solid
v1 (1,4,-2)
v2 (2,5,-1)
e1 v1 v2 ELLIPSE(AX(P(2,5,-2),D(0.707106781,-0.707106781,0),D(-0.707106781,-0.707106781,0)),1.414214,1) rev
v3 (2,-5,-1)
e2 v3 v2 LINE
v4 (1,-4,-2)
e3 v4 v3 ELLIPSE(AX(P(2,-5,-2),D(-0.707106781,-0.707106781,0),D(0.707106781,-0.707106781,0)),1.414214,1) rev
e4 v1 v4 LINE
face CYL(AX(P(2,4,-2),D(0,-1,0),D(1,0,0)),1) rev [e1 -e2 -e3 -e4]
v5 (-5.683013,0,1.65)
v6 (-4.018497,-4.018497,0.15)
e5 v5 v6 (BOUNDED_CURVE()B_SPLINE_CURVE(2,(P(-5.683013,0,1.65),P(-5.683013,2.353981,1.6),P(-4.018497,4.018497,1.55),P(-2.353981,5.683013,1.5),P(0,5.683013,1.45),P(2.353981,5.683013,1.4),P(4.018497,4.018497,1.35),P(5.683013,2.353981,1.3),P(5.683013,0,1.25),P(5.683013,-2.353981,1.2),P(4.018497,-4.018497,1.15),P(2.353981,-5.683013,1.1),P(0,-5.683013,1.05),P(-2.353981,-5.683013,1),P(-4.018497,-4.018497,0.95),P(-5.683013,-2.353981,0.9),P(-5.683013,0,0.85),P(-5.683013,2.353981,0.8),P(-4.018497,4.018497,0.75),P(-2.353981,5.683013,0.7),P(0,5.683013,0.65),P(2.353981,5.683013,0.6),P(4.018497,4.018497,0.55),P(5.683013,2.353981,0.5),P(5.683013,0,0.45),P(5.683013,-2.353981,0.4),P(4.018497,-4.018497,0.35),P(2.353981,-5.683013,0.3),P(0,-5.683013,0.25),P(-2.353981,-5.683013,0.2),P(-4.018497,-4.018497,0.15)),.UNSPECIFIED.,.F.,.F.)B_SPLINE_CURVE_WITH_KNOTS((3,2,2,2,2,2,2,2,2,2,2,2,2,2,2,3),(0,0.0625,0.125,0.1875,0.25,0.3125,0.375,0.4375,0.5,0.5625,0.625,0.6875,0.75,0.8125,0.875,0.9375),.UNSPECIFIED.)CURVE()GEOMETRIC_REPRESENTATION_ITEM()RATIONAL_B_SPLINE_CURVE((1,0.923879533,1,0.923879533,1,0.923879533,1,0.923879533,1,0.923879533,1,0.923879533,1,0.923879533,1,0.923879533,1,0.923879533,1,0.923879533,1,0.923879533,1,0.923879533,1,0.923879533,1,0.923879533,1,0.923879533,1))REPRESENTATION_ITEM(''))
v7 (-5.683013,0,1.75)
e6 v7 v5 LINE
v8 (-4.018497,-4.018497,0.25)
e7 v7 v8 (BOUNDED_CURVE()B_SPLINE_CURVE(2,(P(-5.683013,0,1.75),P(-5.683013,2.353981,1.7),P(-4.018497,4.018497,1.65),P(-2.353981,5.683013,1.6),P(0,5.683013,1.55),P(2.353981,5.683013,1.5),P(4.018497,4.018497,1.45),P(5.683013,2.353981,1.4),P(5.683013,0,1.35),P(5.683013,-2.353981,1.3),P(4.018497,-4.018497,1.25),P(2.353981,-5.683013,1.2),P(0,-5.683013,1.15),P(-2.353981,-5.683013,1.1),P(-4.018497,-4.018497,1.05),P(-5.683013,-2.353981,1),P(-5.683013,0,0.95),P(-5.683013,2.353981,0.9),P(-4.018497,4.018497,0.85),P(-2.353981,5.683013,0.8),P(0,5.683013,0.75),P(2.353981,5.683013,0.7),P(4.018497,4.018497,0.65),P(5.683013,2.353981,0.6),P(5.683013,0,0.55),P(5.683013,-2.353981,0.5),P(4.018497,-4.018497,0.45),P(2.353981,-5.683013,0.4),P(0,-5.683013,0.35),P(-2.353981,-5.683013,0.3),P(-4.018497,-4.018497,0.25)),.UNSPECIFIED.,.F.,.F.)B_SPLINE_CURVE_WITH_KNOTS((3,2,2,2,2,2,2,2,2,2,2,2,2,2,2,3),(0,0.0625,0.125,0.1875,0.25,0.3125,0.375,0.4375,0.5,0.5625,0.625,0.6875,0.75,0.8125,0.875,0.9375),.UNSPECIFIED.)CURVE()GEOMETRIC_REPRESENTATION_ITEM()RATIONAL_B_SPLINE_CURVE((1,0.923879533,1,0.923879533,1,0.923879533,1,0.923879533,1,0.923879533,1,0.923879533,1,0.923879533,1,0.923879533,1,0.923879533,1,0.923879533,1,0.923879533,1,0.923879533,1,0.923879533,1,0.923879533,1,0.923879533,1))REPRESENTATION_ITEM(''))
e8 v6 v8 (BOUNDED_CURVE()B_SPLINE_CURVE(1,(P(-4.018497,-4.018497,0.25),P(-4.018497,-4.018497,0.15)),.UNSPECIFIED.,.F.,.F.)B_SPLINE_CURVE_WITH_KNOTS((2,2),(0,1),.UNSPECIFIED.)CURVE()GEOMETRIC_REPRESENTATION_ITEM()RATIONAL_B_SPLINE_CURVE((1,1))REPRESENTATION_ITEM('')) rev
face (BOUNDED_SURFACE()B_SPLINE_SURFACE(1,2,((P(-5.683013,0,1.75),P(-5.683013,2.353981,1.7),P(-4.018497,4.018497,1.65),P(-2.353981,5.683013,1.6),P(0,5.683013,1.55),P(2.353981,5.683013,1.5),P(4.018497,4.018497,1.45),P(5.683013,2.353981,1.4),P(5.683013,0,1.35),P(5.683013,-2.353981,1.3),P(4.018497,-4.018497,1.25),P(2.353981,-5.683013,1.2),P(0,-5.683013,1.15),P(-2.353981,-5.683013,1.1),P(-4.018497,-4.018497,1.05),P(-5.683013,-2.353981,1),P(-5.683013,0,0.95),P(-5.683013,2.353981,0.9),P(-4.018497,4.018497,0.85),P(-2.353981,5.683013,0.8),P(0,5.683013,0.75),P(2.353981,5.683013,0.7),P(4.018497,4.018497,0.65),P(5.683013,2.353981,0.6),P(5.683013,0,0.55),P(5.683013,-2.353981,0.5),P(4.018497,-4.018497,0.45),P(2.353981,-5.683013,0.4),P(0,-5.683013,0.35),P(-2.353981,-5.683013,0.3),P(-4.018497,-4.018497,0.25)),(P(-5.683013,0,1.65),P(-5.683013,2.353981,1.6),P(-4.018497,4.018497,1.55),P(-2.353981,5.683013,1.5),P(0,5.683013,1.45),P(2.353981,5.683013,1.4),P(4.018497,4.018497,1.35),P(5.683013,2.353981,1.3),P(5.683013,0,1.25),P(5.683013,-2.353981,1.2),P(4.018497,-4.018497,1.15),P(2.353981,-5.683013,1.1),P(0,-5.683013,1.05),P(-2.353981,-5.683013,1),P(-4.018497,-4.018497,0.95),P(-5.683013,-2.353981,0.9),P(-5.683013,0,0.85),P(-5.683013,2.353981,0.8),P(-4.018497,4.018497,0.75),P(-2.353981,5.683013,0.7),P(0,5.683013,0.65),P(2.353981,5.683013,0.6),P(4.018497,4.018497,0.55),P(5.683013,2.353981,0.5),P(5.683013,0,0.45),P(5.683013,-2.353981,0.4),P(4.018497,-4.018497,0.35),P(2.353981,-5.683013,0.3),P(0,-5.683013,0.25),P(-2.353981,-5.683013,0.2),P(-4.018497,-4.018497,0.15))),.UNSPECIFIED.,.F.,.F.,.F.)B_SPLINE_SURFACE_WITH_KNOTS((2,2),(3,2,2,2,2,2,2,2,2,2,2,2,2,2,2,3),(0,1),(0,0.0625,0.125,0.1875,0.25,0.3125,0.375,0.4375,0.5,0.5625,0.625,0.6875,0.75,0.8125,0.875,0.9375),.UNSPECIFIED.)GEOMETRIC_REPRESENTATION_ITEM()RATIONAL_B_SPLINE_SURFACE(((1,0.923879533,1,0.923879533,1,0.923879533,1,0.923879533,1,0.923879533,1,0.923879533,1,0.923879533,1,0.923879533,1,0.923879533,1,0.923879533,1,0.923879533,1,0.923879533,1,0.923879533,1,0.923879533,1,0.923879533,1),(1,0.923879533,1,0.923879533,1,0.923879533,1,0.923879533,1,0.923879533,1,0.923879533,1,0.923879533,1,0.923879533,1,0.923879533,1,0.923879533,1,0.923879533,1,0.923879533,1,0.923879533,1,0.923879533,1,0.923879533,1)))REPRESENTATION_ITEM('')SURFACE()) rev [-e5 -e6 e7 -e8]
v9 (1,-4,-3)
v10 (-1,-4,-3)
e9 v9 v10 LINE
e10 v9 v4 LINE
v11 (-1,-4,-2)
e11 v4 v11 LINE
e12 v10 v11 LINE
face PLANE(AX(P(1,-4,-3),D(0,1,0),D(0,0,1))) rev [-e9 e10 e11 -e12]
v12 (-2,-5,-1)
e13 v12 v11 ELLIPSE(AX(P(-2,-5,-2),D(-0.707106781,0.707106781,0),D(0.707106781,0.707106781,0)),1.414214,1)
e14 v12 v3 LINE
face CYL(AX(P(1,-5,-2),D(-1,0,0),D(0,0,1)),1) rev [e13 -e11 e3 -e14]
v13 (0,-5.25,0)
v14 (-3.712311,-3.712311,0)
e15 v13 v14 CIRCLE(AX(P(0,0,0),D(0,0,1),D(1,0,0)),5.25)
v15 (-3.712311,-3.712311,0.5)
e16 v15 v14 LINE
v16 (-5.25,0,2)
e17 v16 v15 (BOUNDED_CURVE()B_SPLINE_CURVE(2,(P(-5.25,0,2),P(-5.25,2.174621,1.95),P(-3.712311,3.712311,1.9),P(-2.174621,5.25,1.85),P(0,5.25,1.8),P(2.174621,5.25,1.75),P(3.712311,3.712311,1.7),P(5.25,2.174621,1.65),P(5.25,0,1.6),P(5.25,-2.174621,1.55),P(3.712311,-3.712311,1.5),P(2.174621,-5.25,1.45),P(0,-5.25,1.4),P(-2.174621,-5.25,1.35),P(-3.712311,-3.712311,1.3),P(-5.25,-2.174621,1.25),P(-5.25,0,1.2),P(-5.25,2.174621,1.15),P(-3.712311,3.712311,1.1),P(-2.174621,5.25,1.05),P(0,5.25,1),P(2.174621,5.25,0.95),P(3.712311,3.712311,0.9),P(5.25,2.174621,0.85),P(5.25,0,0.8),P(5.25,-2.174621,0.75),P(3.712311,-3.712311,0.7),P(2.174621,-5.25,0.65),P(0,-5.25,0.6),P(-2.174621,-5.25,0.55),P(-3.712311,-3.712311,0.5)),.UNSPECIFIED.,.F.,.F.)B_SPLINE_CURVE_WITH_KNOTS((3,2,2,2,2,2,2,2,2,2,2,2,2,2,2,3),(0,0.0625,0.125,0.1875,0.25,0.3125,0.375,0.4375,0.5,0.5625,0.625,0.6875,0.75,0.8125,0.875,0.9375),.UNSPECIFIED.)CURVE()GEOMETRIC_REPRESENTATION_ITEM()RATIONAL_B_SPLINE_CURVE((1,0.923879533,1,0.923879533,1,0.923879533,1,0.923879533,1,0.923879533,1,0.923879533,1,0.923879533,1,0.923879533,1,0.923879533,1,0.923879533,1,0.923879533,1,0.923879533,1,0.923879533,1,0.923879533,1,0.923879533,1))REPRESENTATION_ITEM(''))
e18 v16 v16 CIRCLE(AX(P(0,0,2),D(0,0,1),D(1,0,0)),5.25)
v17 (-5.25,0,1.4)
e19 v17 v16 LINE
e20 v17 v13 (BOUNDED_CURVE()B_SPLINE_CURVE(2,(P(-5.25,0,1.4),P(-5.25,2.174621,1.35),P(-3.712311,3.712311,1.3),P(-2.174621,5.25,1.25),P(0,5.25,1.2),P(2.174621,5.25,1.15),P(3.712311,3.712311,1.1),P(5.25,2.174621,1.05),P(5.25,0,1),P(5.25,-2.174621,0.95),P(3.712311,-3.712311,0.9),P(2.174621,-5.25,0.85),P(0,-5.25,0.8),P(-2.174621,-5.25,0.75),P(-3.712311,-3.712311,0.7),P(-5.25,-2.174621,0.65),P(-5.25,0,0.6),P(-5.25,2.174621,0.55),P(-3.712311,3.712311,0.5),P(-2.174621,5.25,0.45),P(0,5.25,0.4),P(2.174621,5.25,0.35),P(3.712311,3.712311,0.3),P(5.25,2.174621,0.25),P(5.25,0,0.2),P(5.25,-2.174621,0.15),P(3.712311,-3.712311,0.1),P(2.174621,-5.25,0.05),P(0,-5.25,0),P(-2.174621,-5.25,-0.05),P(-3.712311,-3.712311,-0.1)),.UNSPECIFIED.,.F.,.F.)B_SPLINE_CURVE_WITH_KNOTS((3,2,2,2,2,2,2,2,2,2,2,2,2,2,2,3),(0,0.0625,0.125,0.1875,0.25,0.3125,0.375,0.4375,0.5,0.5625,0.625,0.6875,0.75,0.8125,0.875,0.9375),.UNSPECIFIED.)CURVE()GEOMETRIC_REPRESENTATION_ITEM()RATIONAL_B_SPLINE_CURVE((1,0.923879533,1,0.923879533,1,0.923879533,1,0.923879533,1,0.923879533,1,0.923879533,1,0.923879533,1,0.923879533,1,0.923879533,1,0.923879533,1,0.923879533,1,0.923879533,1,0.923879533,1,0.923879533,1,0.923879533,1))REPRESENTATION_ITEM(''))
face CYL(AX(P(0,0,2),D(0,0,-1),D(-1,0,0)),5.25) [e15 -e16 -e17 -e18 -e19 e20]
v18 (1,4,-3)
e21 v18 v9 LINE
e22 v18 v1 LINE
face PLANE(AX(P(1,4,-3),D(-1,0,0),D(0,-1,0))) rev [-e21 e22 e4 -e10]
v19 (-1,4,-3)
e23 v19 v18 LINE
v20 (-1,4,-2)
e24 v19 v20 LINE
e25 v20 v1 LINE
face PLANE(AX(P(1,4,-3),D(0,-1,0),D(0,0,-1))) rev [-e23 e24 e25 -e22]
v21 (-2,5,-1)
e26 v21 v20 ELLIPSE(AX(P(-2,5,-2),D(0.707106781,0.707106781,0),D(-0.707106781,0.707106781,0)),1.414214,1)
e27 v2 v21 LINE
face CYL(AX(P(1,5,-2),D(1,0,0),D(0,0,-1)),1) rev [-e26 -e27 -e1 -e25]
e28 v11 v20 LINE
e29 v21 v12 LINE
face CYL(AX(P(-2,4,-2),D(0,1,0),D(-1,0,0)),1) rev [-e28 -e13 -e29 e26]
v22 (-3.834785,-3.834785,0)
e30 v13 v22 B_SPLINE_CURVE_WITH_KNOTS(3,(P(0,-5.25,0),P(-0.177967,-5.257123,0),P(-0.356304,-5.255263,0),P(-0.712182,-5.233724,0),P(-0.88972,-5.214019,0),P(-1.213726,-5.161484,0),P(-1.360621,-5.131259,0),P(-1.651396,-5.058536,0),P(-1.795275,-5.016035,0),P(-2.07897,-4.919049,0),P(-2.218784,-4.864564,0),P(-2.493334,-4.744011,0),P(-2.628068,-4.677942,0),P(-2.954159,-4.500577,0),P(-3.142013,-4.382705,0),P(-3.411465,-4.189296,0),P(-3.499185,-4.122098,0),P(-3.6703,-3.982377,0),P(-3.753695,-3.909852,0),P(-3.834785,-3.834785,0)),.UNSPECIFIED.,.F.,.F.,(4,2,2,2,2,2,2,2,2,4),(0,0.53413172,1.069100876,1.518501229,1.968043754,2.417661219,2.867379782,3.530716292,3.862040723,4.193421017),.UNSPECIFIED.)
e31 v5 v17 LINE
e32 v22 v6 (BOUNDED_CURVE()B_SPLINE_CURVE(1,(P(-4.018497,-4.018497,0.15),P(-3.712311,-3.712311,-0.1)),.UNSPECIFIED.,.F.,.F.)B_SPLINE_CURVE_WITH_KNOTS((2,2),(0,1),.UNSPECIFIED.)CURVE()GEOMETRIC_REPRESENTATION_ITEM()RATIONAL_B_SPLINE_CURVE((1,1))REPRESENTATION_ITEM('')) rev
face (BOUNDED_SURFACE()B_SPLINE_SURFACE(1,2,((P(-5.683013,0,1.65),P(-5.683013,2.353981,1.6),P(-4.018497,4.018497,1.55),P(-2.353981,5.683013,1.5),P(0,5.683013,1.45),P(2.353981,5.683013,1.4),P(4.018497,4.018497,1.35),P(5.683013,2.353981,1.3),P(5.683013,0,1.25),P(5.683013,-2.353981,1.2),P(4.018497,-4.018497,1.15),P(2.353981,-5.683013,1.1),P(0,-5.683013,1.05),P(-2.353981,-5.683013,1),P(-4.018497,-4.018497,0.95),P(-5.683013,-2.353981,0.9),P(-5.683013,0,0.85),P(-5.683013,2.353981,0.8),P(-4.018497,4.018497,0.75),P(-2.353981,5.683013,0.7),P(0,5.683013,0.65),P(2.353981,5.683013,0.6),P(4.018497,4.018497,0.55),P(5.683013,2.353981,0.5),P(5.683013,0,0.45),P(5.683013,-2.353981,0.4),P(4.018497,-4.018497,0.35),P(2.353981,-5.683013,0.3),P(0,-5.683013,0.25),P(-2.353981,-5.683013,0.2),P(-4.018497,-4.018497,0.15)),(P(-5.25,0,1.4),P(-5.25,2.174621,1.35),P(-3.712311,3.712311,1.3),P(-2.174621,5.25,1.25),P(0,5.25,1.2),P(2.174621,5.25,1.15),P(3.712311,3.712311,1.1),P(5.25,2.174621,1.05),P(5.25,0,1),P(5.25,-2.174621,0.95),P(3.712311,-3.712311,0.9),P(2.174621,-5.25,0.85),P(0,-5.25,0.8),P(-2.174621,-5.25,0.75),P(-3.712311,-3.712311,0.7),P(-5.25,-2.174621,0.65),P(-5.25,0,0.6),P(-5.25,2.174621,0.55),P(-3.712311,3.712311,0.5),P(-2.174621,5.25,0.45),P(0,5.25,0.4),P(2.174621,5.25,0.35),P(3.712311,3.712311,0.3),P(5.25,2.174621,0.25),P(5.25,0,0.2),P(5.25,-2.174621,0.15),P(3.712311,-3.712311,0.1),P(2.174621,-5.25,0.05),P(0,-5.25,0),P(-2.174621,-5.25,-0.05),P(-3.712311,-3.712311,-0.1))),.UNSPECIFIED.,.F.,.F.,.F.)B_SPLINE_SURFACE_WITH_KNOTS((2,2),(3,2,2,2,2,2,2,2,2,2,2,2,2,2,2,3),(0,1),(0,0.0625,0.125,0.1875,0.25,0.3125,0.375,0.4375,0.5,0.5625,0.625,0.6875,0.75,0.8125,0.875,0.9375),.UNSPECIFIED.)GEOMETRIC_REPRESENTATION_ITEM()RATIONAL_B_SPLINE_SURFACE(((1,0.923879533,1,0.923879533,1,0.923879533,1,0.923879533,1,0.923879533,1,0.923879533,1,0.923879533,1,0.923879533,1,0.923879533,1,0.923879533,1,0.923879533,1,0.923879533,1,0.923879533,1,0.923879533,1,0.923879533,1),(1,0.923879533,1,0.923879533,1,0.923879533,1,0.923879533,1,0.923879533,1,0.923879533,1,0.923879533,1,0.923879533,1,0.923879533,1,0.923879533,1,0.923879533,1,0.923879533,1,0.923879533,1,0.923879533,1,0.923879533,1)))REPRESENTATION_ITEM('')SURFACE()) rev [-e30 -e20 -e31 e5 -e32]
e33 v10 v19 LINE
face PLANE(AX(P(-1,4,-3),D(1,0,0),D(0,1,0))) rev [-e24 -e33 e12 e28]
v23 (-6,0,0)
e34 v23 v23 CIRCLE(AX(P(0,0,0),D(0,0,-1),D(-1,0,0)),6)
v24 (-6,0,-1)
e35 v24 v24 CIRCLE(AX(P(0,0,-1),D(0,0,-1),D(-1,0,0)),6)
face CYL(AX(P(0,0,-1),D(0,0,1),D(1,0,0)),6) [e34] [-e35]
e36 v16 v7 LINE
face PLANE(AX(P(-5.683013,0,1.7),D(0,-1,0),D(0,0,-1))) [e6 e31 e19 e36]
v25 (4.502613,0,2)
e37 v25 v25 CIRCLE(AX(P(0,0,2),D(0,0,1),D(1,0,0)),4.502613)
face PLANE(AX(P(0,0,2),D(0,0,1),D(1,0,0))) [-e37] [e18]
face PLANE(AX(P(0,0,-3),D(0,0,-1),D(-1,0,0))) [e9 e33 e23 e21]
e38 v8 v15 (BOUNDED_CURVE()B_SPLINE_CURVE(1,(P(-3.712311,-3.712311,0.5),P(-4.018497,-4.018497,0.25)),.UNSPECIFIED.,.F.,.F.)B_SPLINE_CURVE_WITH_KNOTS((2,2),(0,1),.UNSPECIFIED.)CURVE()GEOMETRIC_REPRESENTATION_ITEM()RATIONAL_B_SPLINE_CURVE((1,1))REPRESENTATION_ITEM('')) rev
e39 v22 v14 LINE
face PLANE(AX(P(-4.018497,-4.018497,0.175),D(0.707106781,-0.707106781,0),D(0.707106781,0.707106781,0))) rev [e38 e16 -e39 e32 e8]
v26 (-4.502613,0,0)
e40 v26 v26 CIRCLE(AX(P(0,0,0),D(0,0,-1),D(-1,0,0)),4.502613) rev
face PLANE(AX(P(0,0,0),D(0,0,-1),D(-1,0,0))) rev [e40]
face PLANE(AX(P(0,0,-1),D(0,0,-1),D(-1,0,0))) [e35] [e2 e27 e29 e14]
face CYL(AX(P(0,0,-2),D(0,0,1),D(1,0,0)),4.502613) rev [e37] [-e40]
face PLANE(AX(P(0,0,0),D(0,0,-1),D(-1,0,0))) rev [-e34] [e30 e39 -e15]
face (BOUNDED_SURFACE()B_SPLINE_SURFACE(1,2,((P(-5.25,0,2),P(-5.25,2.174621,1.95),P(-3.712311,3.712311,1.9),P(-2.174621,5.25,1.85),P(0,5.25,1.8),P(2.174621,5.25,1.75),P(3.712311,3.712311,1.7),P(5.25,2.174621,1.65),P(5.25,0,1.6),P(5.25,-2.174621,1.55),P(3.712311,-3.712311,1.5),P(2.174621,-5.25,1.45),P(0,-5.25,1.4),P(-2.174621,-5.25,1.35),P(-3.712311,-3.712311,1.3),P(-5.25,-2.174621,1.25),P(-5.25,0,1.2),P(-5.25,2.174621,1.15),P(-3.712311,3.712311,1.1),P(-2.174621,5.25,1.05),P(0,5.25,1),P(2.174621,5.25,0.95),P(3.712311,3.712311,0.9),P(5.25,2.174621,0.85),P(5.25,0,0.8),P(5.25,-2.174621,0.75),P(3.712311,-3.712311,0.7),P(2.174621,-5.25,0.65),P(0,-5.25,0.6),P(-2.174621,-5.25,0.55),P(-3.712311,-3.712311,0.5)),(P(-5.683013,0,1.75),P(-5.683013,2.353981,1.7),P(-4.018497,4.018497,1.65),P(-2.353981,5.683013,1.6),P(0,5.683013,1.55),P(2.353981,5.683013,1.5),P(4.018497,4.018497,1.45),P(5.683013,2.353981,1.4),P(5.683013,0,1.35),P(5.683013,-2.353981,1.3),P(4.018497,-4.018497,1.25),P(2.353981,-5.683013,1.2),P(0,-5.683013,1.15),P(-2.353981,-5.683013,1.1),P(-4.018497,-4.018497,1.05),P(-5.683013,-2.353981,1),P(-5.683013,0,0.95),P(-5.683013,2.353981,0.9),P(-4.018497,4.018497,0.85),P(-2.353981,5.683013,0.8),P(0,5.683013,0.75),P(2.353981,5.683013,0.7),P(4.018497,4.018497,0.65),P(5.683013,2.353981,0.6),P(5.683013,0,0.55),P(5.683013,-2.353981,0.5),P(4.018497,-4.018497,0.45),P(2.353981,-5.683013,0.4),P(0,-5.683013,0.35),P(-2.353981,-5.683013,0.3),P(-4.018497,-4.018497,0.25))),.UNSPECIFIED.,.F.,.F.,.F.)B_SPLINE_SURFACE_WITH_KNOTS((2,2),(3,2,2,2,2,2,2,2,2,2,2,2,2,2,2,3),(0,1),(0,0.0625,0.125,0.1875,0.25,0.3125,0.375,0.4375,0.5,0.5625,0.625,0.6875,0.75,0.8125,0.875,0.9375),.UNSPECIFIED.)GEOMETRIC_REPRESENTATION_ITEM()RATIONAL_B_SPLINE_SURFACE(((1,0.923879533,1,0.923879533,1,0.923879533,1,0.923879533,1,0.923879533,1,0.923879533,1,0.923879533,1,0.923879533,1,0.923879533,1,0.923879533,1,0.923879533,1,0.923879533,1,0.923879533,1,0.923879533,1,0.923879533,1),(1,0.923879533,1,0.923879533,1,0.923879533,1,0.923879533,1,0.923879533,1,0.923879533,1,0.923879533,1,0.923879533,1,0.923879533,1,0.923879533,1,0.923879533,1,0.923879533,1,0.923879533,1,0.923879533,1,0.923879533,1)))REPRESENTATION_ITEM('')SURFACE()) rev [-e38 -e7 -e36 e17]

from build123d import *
from build123d.topology import SkipClean

# Parameters (mm, degrees)
SKETCH1_R           = 5.25
BOSS_EXTRUDE1_DEPTH = 2
THREAD1_PITCH       = 0.8
SKETCH4_R           = 6
BOSS_EXTRUDE2_DEPTH = 1
SKETCH5_R           = 4.502613012
CUT_EXTRUDE1_DEPTH  = 4
BOSS_EXTRUDE3_START = -1
SKETCH7_R           = 6
SKETCH7_R_2         = 4.031118497
BOSS_EXTRUDE3_DEPTH = 1
BOSS_EXTRUDE4_START = -1
SKETCH8_R           = 6
BOSS_EXTRUDE4_DEPTH = 1
SKETCH9_W           = 2
SKETCH9_H           = 8
BOSS_EXTRUDE5_DEPTH = 2
FILLET1_START       = -4
FILLET1_DEPTH       = 8
FILLET1_START_2     = -2
FILLET1_2_DEPTH     = 4
FILLET1_START_3     = -6
FILLET1_3_DEPTH     = 12


with BuildPart() as part:
    # Sketch1 → Boss-Extrude1 (new body)
    with BuildSketch(Plane.XY):
        Circle(SKETCH1_R)
    extrude(amount=BOSS_EXTRUDE1_DEPTH)

    # Thread1: arcs per turn and ends read off the stored shape
    # Thread1: the profile of Thread Profile1 profile screwed along a right-hand helix through 1.875 turns, 8 arcs to a turn; built about Z, then put on its axis
    thread1_z = Axis((0, 0, 0), (0, 0, 1))
    thread1_corners = [(5.2497, 0, -0.000173205), (5.6830127, 0, 0.249999999), (5.6830127, 0, 0.349999999), (5.2497, 0, 0.600173203)]
    with BuildLine(mode=Mode.PRIVATE) as thread1_profile:
        Line(thread1_corners[0], thread1_corners[1])
        Line(thread1_corners[1], thread1_corners[2])
        Line(thread1_corners[2], thread1_corners[3])
        Line(thread1_corners[3], thread1_corners[0])
    thread1_cap = Face(thread1_profile.wire())
    thread1_turn_angles = [0, 22.5, 45, 67.5, 90, 112.5, 135, 157.5, 180, 202.5, 225, 247.5, 270, 292.5, 315, 337.5, 360]
    thread1_turn_weights = [1, 0.9238795325112867, 1, 0.9238795325112867, 1, 0.9238795325112867, 1, 0.9238795325112867, 1, 0.9238795325112867, 1, 0.9238795325112867, 1, 0.9238795325112867, 1, 0.9238795325112867, 1]
    thread1_turn_rails = [Edge.make_bspline([Vector(p[0], p[1], 0).rotate(thread1_z, thread1_turn_angles[k]) / thread1_turn_weights[k] + Vector(0, 0, p[2] + THREAD1_PITCH * thread1_turn_angles[k] / 360) for k in range(17)], [0, 0, 0, 1, 1, 2, 2, 3, 3, 4, 4, 5, 5, 6, 6, 7, 7, 8, 8, 8], 2, thread1_turn_weights) for p in thread1_corners]
    thread1_turn_sides = [Face.make_surface_from_curves(thread1_turn_rails[p[0]], thread1_turn_rails[p[1]]) for p in [(0, 1), (1, 2), (2, 3), (3, 0)]]
    thread1_last_angles = [360, 382.5, 405, 427.5, 450, 472.5, 495, 517.5, 540, 562.5, 585, 607.5, 630, 652.5, 675]
    thread1_last_weights = [1, 0.9238795325112867, 1, 0.9238795325112867, 1, 0.9238795325112867, 1, 0.9238795325112867, 1, 0.9238795325112867, 1, 0.9238795325112867, 1, 0.9238795325112867, 1]
    thread1_last_rails = [Edge.make_bspline([Vector(p[0], p[1], 0).rotate(thread1_z, thread1_last_angles[k]) / thread1_last_weights[k] + Vector(0, 0, p[2] + THREAD1_PITCH * thread1_last_angles[k] / 360) for k in range(15)], [0, 0, 0, 1, 1, 2, 2, 3, 3, 4, 4, 5, 5, 6, 6, 7, 7, 7], 2, thread1_last_weights) for p in thread1_corners]
    thread1_last_sides = [Face.make_surface_from_curves(thread1_last_rails[p[0]], thread1_last_rails[p[1]]) for p in [(0, 1), (1, 2), (2, 3), (3, 0)]]
    thread1 = Plane(origin=(0, 0, 2), x_dir=(-1, 0, 0), z_dir=(0, 0, -1)) * Solid(Shell([*thread1_turn_sides, *thread1_last_sides, thread1_cap, thread1_cap.rotate(thread1_z, 675).moved(Location((0, 0, THREAD1_PITCH * 675 / 360)))]))
    add(thread1)

    # Sketch4 → Boss-Extrude2 (add)
    with BuildSketch(Plane(origin=(0, 0, 0), x_dir=(-1, 0, 0), z_dir=(0, 0, -1))):
        Circle(SKETCH4_R)
    extrude(amount=BOSS_EXTRUDE2_DEPTH)

    # Sketch5 → Cut-Extrude1 (cut)
    with SkipClean():  # the faces are left unmerged after this step: merging them gives an invalid solid
        with BuildSketch(Plane.XY.offset(2)):
            Circle(SKETCH5_R)
        extrude(amount=-CUT_EXTRUDE1_DEPTH, mode=Mode.SUBTRACT)

    # Sketch7 → Boss-Extrude3 (add)
    with SkipClean():  # the faces are left unmerged after this step: merging them gives an invalid solid
        with BuildSketch(Plane(origin=(0, 0, -1), x_dir=(-1, 0, 0), z_dir=(0, 0, -1)).offset(BOSS_EXTRUDE3_START)):
            Circle(SKETCH7_R)
            Circle(SKETCH7_R_2, mode=Mode.SUBTRACT)
        extrude(amount=BOSS_EXTRUDE3_DEPTH)

    # Sketch8 → Boss-Extrude4 (add)
    with SkipClean():  # the faces are left unmerged after this step: merging them gives an invalid solid
        with BuildSketch(Plane(origin=(0, 0, -1), x_dir=(-1, 0, 0), z_dir=(0, 0, -1)).offset(BOSS_EXTRUDE4_START)):
            Circle(SKETCH8_R)
        extrude(amount=BOSS_EXTRUDE4_DEPTH)

    # Sketch9 → Boss-Extrude5 (add)
    with SkipClean():  # the faces are left unmerged after this step: merging them gives an invalid solid
        with BuildSketch(Plane(origin=(0, 0, -1), x_dir=(-1, 0, 0), z_dir=(0, 0, -1))):
            Rectangle(SKETCH9_W, SKETCH9_H)
        extrude(amount=BOSS_EXTRUDE5_DEPTH)

    # Fillet1: read off the stored shape, not the designer's step
    # Fillet1 outline → Fillet1 (add)
    with SkipClean():  # the faces are left unmerged after this step: merging them gives an invalid solid
        with BuildSketch(Plane(origin=(0, 0, 0), x_dir=(1, 0, 0), z_dir=(0, 1, 0)).offset(FILLET1_START)):
            with BuildLine():
                Line((1, 1), (2, 1))
                ThreePointArc((2, 1), (1.292893219, 1.292893219), (1, 2))
                Line((1, 2), (1, 1))
            make_face()
            with BuildLine():
                Line((-2, 1), (-1, 1))
                Line((-1, 1), (-1, 2))
                ThreePointArc((-1, 2), (-1.292893219, 1.292893219), (-2, 1))
            make_face()
        extrude(amount=FILLET1_DEPTH)

    # Fillet1 2 outline → Fillet1 2 (add)
    with SkipClean():  # the faces are left unmerged after this step: merging them gives an invalid solid
        with BuildSketch(Plane.YZ.offset(FILLET1_START_2)):
            with BuildLine():
                Line((-4, -2), (-4, -1))
                Line((-4, -1), (-5, -1))
                ThreePointArc((-5, -1), (-4.292893219, -1.292893219), (-4, -2))
            make_face()
            with BuildLine():
                ThreePointArc((4, -2), (4.292893219, -1.292893219), (5, -1))
                Line((5, -1), (4, -1))
                Line((4, -1), (4, -2))
            make_face()
        extrude(amount=FILLET1_2_DEPTH)

    # Fillet1 3 outline → Fillet1 3 (cut)
    with SkipClean():  # the faces are left unmerged after this step: merging them gives an invalid solid
        with BuildSketch(Plane(origin=(0, 0, 0), x_dir=(1, 0, 0), z_dir=(0, 1, 0)).offset(FILLET1_START_3)):
            with BuildLine():
                Line((2, 2), (1, 2))
                ThreePointArc((1, 2), (1.292893219, 1.292893219), (2, 1))
                Line((2, 1), (2, 2))
            make_face()
            with BuildLine():
                Line((-1, 2), (-2, 2))
                Line((-2, 2), (-2, 1))
                ThreePointArc((-2, 1), (-1.292893219, 1.292893219), (-1, 2))
            make_face()
        extrude(amount=FILLET1_3_DEPTH, mode=Mode.SUBTRACT)


solid = part.part
